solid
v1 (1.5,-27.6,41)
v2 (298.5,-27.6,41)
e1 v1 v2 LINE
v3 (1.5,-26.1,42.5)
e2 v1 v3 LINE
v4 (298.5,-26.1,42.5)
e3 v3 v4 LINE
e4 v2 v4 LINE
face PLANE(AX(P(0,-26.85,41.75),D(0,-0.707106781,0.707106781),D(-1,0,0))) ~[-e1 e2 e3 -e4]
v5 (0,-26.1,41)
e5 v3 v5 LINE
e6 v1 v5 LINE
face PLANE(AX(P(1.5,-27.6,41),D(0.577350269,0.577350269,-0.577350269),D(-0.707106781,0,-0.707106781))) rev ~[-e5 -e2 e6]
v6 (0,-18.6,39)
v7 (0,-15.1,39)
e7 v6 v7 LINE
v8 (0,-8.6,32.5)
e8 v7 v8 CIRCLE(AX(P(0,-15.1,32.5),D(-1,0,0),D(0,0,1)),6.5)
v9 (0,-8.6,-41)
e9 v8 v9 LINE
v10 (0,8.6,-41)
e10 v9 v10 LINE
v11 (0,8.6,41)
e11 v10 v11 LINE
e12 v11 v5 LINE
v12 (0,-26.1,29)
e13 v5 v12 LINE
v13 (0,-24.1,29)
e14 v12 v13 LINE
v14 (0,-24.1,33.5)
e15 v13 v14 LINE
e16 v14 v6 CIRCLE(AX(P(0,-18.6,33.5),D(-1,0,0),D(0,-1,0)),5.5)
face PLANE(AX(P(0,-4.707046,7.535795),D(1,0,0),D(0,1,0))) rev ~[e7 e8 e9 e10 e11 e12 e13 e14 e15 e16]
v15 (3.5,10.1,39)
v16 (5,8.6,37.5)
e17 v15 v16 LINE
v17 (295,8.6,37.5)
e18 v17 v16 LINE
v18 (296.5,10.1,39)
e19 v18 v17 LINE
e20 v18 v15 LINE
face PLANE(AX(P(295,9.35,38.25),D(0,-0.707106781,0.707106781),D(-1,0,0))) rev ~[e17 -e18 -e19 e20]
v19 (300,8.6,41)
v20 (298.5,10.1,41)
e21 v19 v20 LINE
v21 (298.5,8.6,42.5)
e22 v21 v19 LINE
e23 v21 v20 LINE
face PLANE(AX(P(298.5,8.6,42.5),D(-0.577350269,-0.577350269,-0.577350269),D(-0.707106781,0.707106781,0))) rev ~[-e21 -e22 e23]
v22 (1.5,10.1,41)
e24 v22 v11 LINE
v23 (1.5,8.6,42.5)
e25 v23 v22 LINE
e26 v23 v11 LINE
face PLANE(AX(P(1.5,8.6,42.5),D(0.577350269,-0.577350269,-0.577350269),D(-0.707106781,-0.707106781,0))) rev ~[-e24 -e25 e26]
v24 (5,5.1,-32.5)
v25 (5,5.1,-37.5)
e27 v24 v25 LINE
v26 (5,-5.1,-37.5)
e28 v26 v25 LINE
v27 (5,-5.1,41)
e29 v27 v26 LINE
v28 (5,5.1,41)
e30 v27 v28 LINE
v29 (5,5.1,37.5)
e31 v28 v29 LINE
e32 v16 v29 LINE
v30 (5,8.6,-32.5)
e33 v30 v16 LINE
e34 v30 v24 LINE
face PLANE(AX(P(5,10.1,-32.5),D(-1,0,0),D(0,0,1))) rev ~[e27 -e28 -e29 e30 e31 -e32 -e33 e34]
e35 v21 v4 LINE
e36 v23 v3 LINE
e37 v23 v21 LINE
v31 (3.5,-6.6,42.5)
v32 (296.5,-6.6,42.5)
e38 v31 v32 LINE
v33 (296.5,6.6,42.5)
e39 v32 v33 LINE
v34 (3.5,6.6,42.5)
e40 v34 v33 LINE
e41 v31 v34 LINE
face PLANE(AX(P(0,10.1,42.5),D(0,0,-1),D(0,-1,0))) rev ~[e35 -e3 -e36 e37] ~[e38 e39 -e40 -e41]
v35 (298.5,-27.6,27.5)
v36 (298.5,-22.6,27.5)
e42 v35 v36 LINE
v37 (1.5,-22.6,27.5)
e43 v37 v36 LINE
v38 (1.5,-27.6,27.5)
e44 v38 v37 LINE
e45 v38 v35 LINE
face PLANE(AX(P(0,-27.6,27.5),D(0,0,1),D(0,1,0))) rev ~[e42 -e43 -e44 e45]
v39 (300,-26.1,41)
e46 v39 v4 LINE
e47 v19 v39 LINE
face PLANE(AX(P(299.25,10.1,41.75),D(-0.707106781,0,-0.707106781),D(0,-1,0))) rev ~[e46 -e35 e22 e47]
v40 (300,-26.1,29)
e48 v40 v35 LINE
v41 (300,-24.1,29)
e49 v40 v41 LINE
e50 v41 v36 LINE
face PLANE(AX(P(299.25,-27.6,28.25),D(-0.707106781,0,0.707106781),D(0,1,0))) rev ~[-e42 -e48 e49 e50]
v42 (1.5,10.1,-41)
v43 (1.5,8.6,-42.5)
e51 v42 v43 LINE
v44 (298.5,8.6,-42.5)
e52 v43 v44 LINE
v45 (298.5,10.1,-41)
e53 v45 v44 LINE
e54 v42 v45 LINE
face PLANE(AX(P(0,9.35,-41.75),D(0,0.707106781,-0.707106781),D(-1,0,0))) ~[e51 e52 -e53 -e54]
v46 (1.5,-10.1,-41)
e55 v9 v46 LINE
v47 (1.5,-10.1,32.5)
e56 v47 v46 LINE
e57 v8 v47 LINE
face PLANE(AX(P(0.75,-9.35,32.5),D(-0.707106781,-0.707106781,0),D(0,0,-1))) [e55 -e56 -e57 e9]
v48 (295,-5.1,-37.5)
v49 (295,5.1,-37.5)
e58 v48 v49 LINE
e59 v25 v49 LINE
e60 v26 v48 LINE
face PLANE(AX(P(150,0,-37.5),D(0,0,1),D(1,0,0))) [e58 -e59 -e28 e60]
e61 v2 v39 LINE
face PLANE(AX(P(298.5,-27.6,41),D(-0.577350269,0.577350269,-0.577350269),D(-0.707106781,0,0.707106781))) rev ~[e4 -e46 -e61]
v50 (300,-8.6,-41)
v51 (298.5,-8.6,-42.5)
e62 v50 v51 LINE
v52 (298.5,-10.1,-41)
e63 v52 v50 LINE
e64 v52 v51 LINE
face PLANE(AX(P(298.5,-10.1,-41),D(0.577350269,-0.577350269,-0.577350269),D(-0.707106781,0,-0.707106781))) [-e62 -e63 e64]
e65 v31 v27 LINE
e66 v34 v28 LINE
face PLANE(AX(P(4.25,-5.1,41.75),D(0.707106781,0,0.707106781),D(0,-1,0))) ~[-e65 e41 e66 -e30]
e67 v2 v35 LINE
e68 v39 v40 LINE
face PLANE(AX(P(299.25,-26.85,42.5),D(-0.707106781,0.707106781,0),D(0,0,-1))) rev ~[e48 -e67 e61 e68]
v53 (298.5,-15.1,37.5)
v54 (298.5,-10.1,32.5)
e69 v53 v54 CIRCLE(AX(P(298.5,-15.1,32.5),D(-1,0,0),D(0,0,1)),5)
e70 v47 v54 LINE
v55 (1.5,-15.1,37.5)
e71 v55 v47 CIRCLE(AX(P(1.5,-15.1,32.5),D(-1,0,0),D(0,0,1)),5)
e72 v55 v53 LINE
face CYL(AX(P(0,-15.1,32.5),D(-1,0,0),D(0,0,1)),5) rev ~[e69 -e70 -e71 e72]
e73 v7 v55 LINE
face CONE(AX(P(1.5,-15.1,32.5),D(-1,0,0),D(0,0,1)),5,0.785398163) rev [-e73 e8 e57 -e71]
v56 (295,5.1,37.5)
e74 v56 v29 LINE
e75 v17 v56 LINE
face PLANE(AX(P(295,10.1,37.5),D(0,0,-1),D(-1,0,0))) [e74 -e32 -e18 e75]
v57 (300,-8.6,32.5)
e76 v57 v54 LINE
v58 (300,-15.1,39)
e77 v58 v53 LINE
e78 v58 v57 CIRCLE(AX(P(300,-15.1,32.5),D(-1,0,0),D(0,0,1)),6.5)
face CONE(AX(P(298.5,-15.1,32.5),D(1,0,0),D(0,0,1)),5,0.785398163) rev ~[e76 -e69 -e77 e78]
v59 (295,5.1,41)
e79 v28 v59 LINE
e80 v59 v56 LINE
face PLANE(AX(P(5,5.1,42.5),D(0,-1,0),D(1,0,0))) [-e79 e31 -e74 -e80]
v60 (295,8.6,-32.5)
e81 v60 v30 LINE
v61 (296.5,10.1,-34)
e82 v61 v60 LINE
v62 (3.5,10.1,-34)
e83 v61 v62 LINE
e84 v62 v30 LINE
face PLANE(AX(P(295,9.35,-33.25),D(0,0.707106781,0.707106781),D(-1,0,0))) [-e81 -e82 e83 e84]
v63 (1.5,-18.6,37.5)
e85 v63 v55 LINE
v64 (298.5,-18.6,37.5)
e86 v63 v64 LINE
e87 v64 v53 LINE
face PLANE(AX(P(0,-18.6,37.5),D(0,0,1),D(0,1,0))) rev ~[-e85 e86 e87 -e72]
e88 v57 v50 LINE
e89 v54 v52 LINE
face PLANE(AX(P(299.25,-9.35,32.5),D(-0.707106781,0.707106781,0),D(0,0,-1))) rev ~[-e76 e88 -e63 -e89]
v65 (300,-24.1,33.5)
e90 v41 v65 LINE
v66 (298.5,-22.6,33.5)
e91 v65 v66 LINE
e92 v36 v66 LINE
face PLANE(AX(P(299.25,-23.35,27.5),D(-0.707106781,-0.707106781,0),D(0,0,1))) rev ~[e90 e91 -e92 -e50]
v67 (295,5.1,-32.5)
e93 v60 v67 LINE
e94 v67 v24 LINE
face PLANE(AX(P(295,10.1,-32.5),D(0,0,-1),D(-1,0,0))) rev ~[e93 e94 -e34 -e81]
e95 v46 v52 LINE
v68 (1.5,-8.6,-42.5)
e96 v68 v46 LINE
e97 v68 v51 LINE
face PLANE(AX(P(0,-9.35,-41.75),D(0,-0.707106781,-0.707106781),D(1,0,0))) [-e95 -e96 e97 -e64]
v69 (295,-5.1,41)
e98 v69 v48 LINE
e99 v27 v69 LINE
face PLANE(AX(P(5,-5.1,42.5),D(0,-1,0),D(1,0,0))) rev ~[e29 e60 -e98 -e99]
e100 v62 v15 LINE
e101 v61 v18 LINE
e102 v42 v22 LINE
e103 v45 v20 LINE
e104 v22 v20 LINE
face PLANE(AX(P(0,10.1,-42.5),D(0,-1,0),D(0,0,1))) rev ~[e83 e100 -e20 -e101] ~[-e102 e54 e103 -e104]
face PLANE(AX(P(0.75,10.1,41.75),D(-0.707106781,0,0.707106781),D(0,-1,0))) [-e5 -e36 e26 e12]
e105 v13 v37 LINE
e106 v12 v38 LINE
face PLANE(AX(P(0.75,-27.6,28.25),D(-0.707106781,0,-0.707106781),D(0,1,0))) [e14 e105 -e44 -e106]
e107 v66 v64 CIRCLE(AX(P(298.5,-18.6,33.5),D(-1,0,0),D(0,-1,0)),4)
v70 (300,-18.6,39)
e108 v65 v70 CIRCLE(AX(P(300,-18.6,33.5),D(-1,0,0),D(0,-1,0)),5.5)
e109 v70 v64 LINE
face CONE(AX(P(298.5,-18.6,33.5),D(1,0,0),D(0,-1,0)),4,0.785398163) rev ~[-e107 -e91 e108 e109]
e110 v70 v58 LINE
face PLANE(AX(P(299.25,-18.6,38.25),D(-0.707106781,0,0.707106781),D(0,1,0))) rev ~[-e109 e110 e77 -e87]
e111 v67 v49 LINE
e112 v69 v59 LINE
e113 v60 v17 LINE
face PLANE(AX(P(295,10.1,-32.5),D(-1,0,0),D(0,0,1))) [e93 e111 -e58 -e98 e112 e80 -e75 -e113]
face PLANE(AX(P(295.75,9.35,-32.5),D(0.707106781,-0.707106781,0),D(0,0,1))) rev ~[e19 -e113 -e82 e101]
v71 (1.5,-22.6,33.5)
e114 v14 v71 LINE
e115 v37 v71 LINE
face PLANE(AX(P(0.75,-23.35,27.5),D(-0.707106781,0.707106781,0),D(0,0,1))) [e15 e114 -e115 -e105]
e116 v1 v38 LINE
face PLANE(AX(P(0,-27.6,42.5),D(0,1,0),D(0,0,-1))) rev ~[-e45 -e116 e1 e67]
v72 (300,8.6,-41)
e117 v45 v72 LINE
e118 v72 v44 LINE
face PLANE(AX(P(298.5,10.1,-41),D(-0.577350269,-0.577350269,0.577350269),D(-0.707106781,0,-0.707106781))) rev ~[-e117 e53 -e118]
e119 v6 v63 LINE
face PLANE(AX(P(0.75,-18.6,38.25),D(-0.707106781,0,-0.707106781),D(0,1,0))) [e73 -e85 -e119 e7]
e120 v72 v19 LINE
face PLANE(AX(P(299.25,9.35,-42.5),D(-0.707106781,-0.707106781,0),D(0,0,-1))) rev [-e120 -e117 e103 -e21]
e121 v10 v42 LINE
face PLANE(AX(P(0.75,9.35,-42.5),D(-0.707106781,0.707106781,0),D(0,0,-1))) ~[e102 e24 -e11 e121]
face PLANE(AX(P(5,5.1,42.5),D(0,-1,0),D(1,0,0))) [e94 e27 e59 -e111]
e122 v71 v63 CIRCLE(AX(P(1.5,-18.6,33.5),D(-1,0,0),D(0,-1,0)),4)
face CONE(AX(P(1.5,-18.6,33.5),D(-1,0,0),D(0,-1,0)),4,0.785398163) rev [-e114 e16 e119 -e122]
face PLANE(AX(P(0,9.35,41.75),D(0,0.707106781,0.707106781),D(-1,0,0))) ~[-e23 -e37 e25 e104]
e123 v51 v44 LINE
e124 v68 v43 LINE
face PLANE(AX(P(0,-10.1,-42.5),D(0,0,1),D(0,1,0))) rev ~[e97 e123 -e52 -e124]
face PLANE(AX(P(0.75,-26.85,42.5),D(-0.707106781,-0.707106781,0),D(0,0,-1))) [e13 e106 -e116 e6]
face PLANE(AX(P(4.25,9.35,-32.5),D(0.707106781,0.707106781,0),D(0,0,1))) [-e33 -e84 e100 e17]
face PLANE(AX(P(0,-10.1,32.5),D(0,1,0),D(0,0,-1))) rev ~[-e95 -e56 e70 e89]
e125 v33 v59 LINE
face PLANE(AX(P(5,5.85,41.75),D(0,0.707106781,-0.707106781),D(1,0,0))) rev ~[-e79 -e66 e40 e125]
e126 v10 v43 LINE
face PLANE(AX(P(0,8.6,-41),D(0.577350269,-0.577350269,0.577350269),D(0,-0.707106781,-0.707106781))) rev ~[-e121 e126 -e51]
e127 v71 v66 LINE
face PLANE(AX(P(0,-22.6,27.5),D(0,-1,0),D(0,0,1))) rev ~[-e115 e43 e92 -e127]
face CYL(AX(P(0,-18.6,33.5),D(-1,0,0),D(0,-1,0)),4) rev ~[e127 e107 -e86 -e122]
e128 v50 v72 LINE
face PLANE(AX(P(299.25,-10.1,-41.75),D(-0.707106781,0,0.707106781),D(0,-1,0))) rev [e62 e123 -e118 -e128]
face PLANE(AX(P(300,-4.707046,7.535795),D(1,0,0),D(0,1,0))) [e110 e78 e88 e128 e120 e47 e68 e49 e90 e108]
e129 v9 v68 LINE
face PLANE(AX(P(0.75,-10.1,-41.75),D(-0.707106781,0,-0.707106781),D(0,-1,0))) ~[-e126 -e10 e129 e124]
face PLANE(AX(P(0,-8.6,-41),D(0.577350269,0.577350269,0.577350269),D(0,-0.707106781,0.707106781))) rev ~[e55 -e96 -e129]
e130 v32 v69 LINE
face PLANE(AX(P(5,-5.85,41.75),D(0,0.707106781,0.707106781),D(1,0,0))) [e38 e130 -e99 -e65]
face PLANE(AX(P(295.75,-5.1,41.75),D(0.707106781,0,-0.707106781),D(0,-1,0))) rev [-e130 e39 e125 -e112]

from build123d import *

# Parameters (mm, degrees)
F0_W     = 10.2
F0_H     = 75
F1_DEPTH = 300
F2_W     = 290
F2_H     = 70
F3_DEPTH = 5
F4_W     = 290
F4_H     = 10.2
F5_DEPTH = 80
F6_SIZE  = 1.5


# Not quite as in the source:
# - a feature names something its author has since deleted; it is built from what else it names


with BuildPart() as f1:
    # F0 (on Right) → F1 (new body)
    with BuildSketch(Plane.YZ):
        Polygon((-10.1, -42.5), (10.1, -42.5), (10.1, 42.5), (-27.6, 42.5), (-27.6, 27.5), (-22.6, 27.5), (-22.6, 33.5), (-22.6, 37.5), (-18.6, 37.5), (-15.1, 37.5), (-10.1, 37.5), (-10.1, 32.5), align=None)
        Rectangle(F0_W, F0_H, mode=Mode.SUBTRACT)
        with BuildLine():
            ThreePointArc((-22.6, 33.5), (-21.4284271247, 36.3284271247), (-18.6, 37.5))
            Line((-18.6, 37.5), (-22.6, 37.5))
            Line((-22.6, 37.5), (-22.6, 33.5))
        make_face()
        with BuildLine():
            ThreePointArc((-15.1, 37.5), (-11.5644660941, 36.0355339059), (-10.1, 32.5))
            Line((-10.1, 32.5), (-10.1, 37.5))
            Line((-10.1, 37.5), (-15.1, 37.5))
        make_face()
        Rectangle(F0_W, F0_H)
    extrude(amount=F1_DEPTH)

    # F2 (on face) → F3 (cut)
    with BuildSketch(Plane(origin=(0, 10.1, 0), x_dir=(-1, 0, 0), z_dir=(0, 1, 0))):
        with Locations((-150, 2.5)):
            Rectangle(F2_W, F2_H)
    extrude(amount=-F3_DEPTH, mode=Mode.SUBTRACT)

    # F4 (on face) → F5 (cut)
    with BuildSketch(Plane.XY.offset(42.5)):
        with Locations((150, 0)):
            Rectangle(F4_W, F4_H)
    extrude(amount=-F5_DEPTH, mode=Mode.SUBTRACT)

    # F6
    f6_edges = [f1.edges().sort_by_distance(p)[0] for p in [
        (300, 0, -42.5),
        (300, 10.1, 0),
        (300, -8.75, 42.5),
        (300, -27.6, 35),
        (300, -25.1, 27.5),
        (300, -22.6, 30.5),
        (300, -21.428427, 36.328427),
        (300, -16.85, 37.5),
        (300, -11.564466, 36.035534),
        (300, -10.1, -5),
        (150, 10.1, -42.5),
        (0, 10.1, 0),
        (150, 10.1, 42.5),
        (5, 10.1, 2.5),
        (150, 10.1, -32.5),
        (295, 10.1, 2.5),
        (150, 10.1, 37.5),
        (0, -8.75, 42.5),
        (150, -27.6, 42.5),
        (150, -5.1, 42.5),
        (5, 0, 42.5),
        (150, 5.1, 42.5),
        (295, 0, 42.5),
        (150, -10.1, -42.5),
        (0, 0, -42.5),
        (0, -27.6, 35),
        (0, -25.1, 27.5),
        (0, -22.6, 30.5),
        (0, -21.428427, 36.328427),
        (0, -16.85, 37.5),
        (0, -11.564466, 36.035534),
        (0, -10.1, -5),
    ]]
    chamfer(f6_edges, length=F6_SIZE)


solid = f1.part
